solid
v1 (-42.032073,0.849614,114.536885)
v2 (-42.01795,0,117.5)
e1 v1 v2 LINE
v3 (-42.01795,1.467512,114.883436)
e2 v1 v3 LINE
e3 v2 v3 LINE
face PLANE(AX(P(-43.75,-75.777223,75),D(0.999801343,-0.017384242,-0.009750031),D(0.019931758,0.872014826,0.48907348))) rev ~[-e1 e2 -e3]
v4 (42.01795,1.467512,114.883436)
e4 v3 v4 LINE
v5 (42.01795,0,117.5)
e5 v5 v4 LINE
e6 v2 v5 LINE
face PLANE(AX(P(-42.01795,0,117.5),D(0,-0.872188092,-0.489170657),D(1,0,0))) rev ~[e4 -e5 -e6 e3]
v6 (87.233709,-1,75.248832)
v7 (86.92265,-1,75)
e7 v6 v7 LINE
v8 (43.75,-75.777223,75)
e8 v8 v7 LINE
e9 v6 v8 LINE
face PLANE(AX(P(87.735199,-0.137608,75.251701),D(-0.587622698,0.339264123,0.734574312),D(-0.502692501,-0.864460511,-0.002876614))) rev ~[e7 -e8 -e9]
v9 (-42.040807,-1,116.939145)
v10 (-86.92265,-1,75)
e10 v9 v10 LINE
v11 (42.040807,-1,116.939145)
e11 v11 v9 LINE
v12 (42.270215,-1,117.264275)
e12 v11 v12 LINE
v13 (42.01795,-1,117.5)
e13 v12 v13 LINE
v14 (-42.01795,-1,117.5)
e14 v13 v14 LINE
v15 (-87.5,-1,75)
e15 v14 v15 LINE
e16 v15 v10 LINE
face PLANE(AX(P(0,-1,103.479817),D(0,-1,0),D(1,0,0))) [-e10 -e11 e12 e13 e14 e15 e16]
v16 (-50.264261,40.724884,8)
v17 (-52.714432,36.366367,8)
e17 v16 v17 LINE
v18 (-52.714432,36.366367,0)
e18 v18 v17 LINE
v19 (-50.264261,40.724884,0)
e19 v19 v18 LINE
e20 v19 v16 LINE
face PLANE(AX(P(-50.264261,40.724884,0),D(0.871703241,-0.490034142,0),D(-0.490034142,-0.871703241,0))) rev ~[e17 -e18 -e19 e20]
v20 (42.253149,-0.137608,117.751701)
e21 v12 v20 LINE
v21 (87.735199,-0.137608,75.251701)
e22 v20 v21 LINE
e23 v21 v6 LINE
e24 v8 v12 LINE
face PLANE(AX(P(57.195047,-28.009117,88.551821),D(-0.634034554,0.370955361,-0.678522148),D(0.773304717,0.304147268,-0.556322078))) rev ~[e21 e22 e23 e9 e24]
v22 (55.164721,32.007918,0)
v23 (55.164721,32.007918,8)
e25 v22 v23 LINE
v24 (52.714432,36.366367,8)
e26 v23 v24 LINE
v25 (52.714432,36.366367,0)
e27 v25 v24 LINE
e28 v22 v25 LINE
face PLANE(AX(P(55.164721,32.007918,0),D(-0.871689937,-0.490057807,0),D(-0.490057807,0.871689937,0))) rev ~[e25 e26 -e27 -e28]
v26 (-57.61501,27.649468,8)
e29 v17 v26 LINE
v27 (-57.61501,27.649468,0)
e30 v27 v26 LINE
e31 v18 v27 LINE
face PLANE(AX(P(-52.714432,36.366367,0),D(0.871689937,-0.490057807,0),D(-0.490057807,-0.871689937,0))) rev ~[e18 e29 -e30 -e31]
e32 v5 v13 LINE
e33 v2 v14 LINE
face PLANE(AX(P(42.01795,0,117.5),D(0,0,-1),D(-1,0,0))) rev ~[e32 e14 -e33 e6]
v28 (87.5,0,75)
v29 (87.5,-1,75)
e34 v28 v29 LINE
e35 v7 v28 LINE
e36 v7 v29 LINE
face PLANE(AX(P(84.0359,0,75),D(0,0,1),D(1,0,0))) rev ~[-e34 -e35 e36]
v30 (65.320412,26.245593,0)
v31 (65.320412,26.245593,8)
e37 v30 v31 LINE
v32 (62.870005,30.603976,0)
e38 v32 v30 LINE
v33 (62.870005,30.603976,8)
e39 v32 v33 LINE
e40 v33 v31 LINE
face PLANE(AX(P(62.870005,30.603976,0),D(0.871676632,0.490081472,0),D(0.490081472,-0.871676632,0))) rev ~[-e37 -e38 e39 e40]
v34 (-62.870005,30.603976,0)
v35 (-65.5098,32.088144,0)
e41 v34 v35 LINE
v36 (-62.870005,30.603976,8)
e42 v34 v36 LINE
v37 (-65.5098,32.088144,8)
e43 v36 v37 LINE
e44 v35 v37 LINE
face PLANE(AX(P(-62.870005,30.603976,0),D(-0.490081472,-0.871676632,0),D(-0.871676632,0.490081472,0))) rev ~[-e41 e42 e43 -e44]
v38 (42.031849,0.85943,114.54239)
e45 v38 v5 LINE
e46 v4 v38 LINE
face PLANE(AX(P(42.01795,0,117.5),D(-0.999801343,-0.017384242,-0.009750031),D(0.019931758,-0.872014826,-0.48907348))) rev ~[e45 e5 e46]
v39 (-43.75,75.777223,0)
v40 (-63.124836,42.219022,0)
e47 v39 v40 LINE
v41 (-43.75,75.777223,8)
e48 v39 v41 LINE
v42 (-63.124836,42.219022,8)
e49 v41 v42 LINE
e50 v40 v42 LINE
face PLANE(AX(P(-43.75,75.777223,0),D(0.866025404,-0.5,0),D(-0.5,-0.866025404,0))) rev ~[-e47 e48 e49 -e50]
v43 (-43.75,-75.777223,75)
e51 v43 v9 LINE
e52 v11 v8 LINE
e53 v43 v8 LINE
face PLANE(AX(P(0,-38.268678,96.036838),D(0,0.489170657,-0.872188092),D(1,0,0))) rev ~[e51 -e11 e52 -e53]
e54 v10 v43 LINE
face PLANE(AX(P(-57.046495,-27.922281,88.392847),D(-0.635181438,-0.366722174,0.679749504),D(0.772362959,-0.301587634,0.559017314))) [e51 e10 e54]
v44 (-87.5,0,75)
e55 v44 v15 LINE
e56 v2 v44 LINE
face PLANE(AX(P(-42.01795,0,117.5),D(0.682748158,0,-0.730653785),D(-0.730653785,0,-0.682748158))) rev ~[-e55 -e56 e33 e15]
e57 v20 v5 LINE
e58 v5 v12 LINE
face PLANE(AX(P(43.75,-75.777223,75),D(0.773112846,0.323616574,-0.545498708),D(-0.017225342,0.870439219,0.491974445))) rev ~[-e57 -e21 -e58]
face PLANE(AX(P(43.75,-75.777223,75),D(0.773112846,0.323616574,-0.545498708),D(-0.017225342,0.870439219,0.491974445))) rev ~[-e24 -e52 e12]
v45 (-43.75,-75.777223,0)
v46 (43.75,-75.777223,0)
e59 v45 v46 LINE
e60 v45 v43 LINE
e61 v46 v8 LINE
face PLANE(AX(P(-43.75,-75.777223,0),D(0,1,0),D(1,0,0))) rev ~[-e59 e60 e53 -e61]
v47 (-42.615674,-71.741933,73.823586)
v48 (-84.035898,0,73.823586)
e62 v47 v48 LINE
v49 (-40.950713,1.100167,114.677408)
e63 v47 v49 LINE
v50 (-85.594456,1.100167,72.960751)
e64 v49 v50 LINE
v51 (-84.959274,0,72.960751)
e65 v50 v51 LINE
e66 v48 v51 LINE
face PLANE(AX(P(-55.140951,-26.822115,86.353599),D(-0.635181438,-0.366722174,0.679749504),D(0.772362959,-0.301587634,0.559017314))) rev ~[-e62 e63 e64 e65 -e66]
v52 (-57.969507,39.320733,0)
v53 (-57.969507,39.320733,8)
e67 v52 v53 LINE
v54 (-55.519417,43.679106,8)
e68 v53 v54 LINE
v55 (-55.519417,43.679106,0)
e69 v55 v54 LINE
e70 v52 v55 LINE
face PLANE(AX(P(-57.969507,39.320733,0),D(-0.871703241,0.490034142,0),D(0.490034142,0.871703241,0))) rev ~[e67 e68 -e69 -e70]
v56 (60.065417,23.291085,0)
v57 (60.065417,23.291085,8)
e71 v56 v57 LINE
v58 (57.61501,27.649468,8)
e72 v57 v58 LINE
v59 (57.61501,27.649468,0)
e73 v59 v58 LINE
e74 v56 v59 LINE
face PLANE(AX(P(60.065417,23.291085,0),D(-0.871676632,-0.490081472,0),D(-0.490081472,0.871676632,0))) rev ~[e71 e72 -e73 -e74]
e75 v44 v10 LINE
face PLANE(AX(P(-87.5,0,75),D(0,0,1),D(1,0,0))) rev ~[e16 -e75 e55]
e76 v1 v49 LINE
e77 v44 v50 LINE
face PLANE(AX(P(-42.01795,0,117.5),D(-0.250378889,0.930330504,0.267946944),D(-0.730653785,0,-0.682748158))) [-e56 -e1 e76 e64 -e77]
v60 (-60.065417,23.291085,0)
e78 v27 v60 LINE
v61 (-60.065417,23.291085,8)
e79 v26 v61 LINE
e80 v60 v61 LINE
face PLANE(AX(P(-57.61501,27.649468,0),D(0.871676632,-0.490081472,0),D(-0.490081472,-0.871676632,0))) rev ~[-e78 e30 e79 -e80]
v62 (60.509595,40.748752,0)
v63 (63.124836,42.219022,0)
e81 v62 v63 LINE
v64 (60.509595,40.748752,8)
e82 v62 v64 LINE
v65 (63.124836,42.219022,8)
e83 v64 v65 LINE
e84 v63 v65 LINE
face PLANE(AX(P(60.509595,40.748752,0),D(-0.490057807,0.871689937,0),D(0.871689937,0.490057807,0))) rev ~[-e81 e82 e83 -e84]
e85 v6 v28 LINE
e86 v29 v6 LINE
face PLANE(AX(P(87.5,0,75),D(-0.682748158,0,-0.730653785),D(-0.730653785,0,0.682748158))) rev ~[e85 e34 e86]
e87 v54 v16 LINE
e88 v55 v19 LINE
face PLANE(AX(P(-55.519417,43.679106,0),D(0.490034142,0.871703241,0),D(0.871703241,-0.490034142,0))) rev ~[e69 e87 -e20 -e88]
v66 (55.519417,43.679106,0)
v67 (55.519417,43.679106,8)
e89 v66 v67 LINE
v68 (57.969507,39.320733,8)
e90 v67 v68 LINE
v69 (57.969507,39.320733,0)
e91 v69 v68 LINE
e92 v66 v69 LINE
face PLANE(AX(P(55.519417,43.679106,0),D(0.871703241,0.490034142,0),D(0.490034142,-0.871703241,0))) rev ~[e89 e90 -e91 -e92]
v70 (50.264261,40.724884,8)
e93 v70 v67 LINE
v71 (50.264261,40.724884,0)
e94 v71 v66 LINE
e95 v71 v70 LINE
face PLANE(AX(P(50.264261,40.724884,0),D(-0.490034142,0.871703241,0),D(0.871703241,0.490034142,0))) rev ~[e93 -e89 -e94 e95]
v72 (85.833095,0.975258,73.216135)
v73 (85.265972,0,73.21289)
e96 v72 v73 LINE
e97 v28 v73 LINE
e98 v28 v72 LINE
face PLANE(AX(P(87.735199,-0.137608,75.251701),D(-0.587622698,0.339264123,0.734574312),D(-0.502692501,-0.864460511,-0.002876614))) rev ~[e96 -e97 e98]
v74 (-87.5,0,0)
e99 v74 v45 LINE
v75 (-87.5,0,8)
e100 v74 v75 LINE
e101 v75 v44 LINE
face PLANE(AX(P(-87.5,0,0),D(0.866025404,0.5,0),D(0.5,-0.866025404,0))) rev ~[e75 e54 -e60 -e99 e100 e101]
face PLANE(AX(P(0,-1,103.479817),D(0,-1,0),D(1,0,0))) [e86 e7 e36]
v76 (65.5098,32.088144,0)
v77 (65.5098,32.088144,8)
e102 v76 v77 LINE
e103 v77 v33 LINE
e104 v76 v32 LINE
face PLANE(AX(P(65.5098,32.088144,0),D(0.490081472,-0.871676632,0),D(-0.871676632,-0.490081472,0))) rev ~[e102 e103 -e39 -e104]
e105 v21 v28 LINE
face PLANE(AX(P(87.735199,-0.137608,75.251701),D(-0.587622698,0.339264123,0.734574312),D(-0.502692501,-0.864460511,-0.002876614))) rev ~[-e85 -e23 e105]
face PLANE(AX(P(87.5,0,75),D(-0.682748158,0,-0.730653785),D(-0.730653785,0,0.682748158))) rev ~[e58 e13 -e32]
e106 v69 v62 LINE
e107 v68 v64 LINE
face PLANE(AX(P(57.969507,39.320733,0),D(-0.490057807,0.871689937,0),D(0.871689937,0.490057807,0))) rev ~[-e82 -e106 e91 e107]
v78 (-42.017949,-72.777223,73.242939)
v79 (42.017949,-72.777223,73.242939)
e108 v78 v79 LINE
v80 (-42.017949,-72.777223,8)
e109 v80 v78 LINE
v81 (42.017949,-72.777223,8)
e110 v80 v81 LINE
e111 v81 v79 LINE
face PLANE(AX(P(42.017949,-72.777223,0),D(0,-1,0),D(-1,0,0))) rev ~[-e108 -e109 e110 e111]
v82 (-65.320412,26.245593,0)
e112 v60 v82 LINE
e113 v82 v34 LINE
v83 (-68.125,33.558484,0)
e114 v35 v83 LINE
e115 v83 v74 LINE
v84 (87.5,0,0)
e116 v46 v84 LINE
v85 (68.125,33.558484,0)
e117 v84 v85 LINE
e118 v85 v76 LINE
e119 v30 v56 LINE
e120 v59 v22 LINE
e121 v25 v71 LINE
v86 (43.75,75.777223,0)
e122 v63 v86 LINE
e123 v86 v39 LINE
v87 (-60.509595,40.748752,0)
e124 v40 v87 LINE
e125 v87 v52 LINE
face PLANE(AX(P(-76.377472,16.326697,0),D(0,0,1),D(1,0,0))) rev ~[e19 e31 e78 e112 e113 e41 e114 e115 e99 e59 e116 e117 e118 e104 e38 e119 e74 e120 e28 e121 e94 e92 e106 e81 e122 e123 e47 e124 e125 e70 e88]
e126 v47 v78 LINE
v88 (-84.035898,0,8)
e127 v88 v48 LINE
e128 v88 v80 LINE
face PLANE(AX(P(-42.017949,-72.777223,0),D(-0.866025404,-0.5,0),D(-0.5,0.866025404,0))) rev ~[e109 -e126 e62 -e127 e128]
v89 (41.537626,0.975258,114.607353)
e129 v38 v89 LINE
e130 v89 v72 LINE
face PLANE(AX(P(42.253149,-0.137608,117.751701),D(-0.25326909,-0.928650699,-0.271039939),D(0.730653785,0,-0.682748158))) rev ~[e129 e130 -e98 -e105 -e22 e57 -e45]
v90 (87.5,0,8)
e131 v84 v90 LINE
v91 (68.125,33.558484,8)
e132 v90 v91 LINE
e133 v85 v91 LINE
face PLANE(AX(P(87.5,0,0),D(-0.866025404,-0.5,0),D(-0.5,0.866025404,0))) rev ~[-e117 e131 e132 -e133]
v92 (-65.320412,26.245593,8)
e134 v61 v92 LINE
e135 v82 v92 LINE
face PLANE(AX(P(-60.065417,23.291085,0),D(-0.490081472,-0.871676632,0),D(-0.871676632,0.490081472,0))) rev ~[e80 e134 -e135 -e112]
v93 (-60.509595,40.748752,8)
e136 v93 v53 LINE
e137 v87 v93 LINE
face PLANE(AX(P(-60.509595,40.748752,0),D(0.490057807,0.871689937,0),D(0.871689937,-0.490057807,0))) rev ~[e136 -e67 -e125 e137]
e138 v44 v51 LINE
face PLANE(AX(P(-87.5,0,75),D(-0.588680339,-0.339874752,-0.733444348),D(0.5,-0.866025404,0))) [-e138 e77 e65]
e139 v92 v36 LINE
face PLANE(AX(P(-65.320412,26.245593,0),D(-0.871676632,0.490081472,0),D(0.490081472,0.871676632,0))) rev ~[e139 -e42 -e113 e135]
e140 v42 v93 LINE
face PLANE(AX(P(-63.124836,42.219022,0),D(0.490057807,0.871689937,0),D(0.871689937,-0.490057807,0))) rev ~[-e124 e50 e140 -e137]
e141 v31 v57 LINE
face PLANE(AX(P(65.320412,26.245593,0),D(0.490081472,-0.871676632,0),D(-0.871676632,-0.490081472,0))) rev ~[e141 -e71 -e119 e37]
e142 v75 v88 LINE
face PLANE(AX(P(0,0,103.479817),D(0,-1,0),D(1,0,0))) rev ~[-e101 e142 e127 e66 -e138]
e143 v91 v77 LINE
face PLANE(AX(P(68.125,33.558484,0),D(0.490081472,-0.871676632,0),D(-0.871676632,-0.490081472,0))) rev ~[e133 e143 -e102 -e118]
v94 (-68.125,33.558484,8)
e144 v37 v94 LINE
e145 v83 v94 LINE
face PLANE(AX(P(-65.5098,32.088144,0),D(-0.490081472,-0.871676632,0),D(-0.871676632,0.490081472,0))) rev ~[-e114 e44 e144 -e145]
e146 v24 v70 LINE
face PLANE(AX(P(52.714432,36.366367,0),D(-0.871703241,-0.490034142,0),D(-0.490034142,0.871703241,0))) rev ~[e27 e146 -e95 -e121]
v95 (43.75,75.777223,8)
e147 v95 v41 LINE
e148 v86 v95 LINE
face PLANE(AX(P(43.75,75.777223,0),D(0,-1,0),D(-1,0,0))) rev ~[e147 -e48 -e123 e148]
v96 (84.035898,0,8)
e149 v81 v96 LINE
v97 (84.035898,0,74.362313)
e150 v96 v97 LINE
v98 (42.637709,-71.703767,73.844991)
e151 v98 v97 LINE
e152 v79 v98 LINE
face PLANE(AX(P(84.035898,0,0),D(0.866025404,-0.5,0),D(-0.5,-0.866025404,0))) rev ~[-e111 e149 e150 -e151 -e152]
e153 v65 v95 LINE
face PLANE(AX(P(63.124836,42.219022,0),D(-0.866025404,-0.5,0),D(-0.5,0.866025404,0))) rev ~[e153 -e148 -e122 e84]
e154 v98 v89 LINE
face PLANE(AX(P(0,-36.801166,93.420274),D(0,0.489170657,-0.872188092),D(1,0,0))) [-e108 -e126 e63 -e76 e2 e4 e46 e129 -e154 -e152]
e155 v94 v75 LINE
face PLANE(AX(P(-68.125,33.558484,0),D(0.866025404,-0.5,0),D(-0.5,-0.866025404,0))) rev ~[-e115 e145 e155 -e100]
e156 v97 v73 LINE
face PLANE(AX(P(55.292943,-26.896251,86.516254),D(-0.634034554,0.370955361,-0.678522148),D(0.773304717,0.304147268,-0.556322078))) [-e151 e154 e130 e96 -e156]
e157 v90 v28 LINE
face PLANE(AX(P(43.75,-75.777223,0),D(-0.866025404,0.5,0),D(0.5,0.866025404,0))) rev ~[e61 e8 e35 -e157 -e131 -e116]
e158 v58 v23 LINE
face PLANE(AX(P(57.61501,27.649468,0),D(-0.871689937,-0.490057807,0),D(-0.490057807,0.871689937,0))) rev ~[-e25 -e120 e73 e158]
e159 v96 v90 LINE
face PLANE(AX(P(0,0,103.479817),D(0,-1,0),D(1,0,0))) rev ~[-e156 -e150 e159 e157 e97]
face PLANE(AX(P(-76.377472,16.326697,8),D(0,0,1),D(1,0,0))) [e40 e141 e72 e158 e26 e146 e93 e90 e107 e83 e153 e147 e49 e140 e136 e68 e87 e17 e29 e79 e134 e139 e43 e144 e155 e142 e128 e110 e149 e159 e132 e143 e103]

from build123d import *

# Parameters (mm, degrees)
F0_W      = 50
F0_H      = 12.5
F1_DEPTH  = 8
F2_DEPTH  = 75
F4_DEPTH  = 8
F7_DEPTH  = 3
F8_DEPTH  = 1
F11_DEPTH = 3
F14_DEPTH = 3
F15_DEPTH = 8
F16_DEPTH = 25
F17_DEPTH = 8


# Not quite as in the source:
# - a feature names something its author has since deleted; it is built from what else it names


with BuildPart() as f1:
    # F0 (on Top) → F1 (new body)
    with BuildSketch(Plane.XY):
        Polygon((-42.0179491924, 72.7772228311), (-60.5095952989, 40.7487522591), (-57.9695070384, 39.3207329262), (-55.5194165334, 43.6791064608), (-50.2642610162, 40.7248836223), (-52.7144317239, 36.366367418), (-57.615009792, 27.6494680496), (-60.0654171506, 23.2910848888), (-65.3204122546, 26.2455930623), (-62.870004896, 30.6039762231), (-65.5097997054, 32.0881441788), (-84.0358983849, 0), (-42.0179491924, -72.7772228311), (42.0179491924, -72.7772228311), (84.0358983849, 0), (65.5097997054, 32.0881441788), (62.870004896, 30.6039762231), (65.3204122546, 26.2455930623), (60.0654171506, 23.2910848888), (57.615009792, 27.6494680496), (55.164720758, 32.0079177338), (52.7144317239, 36.366367418), (50.2642610162, 40.7248836223), (55.5194165334, 43.6791064608), (57.9695070384, 39.3207329262), (60.5095952989, 40.7487522591), (42.0179491924, 72.7772228311), align=None)
        with Locations((0, 54.5829171234)):
            Rectangle(F0_W, F0_H, mode=Mode.SUBTRACT)
    extrude(amount=F1_DEPTH)

    # F0 (on Top) → F2 (join)
    with BuildSketch(Plane.XY):
        Polygon((43.75, -75.7772228311), (87.5, 0), (84.0358983849, 0), (42.0179491924, -72.7772228311), (-42.0179491924, -72.7772228311), (-84.0358983849, 0), (-87.5, 0), (-43.75, -75.7772228311), align=None)
    extrude(amount=F2_DEPTH)

    # F0 (on Top) → F4 (join)
    with BuildSketch(Plane.XY):
        Polygon((43.75, 75.7772228311), (-43.75, 75.7772228311), (-63.1248363216, 42.2190219338), (-60.5095952989, 40.7487522591), (-42.0179491924, 72.7772228311), (42.0179491924, 72.7772228311), (60.5095952989, 40.7487522591), (63.1248363216, 42.2190219338), align=None)
    extrude(amount=F4_DEPTH)

    # F6 (on face) → F7 (join)
    with BuildSketch(Plane(origin=(0, -50.1312366318, 89.3836679776), x_dir=(1, 0, 0), z_dir=(0, 0.4891706574, -0.872188092))):
        Polygon((43.75, 29.4041920927), (0, 29.4041920927), (-43.75, 29.4041920927), (-42.01795, -57.4775522498), (42.01795, -57.4775522498), align=None)
    extrude(amount=F7_DEPTH)

    # F3 (on Front) → F8 (join)
    with BuildSketch(Plane.XZ):
        Polygon((-42.01795, 114.5), (0, 114.5), (42.01795, 114.5), (84.0359, 75), (87.5, 75), (42.01795, 117.5), (0, 117.5), (-42.01795, 117.5), (-87.5, 75), (-84.0359, 75), align=None)
    extrude(amount=F8_DEPTH)

    # F10 (on face) → F11 (join)
    with BuildSketch(Plane(origin=(-67.6846727043, -39.0777640058, 72.4338274863), x_dir=(0.7723629594, -0.3015876344, 0.5590173143), z_dir=(-0.6351814378, -0.3667221741, 0.6797495039))):
        Polygon((33.2314262259, 55.789645187), (-25.6554603702, 35.6104118215), (30.9888924807, -31.0804218073), align=None)
    extrude(amount=-F11_DEPTH)

    # F13 (on face) → F14 (join)
    with BuildSketch(Plane(origin=(67.6756688636, -39.5950852503, 72.4241918832), x_dir=(0.7733047167, 0.3041472681, -0.556322078), z_dir=(-0.6340345536, 0.3709553614, -0.6785221475))):
        Polygon((-30.939509805, 30.5117392321), (-32.8751652468, -56.3649154418), (25.9400068576, -35.9776056011), align=None)
    extrude(amount=F14_DEPTH)

    # F0 (on Top) → F15 (join)
    with BuildSketch(Plane.XY):
        with Locations((0, 54.5829171234)):
            Rectangle(F0_W, F0_H)
    extrude(amount=F15_DEPTH)

    # F0 (on Top) → F16 (cut)
    with BuildSketch(Plane.XY):
        Polygon((-57.9695070384, 39.3207329262), (-60.5095952989, 40.7487522591), (-65.5097997054, 32.0881441788), (-62.870004896, 30.6039762231), (-57.615009792, 27.6494680496), (-52.7144317239, 36.366367418), align=None)
    extrude(amount=-F16_DEPTH, mode=Mode.SUBTRACT)

    # F0 (on Top) → F17 (join)
    with BuildSketch(Plane.XY):
        Polygon((-65.5097997054, 32.0881441788), (-68.125, 33.5584843966), (-87.5, 0), (-84.0358983849, 0), align=None)
        Polygon((87.5, 0), (68.125, 33.5584843966), (65.5097997054, 32.0881441788), (84.0358983849, 0), align=None)
    extrude(amount=F17_DEPTH)


solid = f1.part
